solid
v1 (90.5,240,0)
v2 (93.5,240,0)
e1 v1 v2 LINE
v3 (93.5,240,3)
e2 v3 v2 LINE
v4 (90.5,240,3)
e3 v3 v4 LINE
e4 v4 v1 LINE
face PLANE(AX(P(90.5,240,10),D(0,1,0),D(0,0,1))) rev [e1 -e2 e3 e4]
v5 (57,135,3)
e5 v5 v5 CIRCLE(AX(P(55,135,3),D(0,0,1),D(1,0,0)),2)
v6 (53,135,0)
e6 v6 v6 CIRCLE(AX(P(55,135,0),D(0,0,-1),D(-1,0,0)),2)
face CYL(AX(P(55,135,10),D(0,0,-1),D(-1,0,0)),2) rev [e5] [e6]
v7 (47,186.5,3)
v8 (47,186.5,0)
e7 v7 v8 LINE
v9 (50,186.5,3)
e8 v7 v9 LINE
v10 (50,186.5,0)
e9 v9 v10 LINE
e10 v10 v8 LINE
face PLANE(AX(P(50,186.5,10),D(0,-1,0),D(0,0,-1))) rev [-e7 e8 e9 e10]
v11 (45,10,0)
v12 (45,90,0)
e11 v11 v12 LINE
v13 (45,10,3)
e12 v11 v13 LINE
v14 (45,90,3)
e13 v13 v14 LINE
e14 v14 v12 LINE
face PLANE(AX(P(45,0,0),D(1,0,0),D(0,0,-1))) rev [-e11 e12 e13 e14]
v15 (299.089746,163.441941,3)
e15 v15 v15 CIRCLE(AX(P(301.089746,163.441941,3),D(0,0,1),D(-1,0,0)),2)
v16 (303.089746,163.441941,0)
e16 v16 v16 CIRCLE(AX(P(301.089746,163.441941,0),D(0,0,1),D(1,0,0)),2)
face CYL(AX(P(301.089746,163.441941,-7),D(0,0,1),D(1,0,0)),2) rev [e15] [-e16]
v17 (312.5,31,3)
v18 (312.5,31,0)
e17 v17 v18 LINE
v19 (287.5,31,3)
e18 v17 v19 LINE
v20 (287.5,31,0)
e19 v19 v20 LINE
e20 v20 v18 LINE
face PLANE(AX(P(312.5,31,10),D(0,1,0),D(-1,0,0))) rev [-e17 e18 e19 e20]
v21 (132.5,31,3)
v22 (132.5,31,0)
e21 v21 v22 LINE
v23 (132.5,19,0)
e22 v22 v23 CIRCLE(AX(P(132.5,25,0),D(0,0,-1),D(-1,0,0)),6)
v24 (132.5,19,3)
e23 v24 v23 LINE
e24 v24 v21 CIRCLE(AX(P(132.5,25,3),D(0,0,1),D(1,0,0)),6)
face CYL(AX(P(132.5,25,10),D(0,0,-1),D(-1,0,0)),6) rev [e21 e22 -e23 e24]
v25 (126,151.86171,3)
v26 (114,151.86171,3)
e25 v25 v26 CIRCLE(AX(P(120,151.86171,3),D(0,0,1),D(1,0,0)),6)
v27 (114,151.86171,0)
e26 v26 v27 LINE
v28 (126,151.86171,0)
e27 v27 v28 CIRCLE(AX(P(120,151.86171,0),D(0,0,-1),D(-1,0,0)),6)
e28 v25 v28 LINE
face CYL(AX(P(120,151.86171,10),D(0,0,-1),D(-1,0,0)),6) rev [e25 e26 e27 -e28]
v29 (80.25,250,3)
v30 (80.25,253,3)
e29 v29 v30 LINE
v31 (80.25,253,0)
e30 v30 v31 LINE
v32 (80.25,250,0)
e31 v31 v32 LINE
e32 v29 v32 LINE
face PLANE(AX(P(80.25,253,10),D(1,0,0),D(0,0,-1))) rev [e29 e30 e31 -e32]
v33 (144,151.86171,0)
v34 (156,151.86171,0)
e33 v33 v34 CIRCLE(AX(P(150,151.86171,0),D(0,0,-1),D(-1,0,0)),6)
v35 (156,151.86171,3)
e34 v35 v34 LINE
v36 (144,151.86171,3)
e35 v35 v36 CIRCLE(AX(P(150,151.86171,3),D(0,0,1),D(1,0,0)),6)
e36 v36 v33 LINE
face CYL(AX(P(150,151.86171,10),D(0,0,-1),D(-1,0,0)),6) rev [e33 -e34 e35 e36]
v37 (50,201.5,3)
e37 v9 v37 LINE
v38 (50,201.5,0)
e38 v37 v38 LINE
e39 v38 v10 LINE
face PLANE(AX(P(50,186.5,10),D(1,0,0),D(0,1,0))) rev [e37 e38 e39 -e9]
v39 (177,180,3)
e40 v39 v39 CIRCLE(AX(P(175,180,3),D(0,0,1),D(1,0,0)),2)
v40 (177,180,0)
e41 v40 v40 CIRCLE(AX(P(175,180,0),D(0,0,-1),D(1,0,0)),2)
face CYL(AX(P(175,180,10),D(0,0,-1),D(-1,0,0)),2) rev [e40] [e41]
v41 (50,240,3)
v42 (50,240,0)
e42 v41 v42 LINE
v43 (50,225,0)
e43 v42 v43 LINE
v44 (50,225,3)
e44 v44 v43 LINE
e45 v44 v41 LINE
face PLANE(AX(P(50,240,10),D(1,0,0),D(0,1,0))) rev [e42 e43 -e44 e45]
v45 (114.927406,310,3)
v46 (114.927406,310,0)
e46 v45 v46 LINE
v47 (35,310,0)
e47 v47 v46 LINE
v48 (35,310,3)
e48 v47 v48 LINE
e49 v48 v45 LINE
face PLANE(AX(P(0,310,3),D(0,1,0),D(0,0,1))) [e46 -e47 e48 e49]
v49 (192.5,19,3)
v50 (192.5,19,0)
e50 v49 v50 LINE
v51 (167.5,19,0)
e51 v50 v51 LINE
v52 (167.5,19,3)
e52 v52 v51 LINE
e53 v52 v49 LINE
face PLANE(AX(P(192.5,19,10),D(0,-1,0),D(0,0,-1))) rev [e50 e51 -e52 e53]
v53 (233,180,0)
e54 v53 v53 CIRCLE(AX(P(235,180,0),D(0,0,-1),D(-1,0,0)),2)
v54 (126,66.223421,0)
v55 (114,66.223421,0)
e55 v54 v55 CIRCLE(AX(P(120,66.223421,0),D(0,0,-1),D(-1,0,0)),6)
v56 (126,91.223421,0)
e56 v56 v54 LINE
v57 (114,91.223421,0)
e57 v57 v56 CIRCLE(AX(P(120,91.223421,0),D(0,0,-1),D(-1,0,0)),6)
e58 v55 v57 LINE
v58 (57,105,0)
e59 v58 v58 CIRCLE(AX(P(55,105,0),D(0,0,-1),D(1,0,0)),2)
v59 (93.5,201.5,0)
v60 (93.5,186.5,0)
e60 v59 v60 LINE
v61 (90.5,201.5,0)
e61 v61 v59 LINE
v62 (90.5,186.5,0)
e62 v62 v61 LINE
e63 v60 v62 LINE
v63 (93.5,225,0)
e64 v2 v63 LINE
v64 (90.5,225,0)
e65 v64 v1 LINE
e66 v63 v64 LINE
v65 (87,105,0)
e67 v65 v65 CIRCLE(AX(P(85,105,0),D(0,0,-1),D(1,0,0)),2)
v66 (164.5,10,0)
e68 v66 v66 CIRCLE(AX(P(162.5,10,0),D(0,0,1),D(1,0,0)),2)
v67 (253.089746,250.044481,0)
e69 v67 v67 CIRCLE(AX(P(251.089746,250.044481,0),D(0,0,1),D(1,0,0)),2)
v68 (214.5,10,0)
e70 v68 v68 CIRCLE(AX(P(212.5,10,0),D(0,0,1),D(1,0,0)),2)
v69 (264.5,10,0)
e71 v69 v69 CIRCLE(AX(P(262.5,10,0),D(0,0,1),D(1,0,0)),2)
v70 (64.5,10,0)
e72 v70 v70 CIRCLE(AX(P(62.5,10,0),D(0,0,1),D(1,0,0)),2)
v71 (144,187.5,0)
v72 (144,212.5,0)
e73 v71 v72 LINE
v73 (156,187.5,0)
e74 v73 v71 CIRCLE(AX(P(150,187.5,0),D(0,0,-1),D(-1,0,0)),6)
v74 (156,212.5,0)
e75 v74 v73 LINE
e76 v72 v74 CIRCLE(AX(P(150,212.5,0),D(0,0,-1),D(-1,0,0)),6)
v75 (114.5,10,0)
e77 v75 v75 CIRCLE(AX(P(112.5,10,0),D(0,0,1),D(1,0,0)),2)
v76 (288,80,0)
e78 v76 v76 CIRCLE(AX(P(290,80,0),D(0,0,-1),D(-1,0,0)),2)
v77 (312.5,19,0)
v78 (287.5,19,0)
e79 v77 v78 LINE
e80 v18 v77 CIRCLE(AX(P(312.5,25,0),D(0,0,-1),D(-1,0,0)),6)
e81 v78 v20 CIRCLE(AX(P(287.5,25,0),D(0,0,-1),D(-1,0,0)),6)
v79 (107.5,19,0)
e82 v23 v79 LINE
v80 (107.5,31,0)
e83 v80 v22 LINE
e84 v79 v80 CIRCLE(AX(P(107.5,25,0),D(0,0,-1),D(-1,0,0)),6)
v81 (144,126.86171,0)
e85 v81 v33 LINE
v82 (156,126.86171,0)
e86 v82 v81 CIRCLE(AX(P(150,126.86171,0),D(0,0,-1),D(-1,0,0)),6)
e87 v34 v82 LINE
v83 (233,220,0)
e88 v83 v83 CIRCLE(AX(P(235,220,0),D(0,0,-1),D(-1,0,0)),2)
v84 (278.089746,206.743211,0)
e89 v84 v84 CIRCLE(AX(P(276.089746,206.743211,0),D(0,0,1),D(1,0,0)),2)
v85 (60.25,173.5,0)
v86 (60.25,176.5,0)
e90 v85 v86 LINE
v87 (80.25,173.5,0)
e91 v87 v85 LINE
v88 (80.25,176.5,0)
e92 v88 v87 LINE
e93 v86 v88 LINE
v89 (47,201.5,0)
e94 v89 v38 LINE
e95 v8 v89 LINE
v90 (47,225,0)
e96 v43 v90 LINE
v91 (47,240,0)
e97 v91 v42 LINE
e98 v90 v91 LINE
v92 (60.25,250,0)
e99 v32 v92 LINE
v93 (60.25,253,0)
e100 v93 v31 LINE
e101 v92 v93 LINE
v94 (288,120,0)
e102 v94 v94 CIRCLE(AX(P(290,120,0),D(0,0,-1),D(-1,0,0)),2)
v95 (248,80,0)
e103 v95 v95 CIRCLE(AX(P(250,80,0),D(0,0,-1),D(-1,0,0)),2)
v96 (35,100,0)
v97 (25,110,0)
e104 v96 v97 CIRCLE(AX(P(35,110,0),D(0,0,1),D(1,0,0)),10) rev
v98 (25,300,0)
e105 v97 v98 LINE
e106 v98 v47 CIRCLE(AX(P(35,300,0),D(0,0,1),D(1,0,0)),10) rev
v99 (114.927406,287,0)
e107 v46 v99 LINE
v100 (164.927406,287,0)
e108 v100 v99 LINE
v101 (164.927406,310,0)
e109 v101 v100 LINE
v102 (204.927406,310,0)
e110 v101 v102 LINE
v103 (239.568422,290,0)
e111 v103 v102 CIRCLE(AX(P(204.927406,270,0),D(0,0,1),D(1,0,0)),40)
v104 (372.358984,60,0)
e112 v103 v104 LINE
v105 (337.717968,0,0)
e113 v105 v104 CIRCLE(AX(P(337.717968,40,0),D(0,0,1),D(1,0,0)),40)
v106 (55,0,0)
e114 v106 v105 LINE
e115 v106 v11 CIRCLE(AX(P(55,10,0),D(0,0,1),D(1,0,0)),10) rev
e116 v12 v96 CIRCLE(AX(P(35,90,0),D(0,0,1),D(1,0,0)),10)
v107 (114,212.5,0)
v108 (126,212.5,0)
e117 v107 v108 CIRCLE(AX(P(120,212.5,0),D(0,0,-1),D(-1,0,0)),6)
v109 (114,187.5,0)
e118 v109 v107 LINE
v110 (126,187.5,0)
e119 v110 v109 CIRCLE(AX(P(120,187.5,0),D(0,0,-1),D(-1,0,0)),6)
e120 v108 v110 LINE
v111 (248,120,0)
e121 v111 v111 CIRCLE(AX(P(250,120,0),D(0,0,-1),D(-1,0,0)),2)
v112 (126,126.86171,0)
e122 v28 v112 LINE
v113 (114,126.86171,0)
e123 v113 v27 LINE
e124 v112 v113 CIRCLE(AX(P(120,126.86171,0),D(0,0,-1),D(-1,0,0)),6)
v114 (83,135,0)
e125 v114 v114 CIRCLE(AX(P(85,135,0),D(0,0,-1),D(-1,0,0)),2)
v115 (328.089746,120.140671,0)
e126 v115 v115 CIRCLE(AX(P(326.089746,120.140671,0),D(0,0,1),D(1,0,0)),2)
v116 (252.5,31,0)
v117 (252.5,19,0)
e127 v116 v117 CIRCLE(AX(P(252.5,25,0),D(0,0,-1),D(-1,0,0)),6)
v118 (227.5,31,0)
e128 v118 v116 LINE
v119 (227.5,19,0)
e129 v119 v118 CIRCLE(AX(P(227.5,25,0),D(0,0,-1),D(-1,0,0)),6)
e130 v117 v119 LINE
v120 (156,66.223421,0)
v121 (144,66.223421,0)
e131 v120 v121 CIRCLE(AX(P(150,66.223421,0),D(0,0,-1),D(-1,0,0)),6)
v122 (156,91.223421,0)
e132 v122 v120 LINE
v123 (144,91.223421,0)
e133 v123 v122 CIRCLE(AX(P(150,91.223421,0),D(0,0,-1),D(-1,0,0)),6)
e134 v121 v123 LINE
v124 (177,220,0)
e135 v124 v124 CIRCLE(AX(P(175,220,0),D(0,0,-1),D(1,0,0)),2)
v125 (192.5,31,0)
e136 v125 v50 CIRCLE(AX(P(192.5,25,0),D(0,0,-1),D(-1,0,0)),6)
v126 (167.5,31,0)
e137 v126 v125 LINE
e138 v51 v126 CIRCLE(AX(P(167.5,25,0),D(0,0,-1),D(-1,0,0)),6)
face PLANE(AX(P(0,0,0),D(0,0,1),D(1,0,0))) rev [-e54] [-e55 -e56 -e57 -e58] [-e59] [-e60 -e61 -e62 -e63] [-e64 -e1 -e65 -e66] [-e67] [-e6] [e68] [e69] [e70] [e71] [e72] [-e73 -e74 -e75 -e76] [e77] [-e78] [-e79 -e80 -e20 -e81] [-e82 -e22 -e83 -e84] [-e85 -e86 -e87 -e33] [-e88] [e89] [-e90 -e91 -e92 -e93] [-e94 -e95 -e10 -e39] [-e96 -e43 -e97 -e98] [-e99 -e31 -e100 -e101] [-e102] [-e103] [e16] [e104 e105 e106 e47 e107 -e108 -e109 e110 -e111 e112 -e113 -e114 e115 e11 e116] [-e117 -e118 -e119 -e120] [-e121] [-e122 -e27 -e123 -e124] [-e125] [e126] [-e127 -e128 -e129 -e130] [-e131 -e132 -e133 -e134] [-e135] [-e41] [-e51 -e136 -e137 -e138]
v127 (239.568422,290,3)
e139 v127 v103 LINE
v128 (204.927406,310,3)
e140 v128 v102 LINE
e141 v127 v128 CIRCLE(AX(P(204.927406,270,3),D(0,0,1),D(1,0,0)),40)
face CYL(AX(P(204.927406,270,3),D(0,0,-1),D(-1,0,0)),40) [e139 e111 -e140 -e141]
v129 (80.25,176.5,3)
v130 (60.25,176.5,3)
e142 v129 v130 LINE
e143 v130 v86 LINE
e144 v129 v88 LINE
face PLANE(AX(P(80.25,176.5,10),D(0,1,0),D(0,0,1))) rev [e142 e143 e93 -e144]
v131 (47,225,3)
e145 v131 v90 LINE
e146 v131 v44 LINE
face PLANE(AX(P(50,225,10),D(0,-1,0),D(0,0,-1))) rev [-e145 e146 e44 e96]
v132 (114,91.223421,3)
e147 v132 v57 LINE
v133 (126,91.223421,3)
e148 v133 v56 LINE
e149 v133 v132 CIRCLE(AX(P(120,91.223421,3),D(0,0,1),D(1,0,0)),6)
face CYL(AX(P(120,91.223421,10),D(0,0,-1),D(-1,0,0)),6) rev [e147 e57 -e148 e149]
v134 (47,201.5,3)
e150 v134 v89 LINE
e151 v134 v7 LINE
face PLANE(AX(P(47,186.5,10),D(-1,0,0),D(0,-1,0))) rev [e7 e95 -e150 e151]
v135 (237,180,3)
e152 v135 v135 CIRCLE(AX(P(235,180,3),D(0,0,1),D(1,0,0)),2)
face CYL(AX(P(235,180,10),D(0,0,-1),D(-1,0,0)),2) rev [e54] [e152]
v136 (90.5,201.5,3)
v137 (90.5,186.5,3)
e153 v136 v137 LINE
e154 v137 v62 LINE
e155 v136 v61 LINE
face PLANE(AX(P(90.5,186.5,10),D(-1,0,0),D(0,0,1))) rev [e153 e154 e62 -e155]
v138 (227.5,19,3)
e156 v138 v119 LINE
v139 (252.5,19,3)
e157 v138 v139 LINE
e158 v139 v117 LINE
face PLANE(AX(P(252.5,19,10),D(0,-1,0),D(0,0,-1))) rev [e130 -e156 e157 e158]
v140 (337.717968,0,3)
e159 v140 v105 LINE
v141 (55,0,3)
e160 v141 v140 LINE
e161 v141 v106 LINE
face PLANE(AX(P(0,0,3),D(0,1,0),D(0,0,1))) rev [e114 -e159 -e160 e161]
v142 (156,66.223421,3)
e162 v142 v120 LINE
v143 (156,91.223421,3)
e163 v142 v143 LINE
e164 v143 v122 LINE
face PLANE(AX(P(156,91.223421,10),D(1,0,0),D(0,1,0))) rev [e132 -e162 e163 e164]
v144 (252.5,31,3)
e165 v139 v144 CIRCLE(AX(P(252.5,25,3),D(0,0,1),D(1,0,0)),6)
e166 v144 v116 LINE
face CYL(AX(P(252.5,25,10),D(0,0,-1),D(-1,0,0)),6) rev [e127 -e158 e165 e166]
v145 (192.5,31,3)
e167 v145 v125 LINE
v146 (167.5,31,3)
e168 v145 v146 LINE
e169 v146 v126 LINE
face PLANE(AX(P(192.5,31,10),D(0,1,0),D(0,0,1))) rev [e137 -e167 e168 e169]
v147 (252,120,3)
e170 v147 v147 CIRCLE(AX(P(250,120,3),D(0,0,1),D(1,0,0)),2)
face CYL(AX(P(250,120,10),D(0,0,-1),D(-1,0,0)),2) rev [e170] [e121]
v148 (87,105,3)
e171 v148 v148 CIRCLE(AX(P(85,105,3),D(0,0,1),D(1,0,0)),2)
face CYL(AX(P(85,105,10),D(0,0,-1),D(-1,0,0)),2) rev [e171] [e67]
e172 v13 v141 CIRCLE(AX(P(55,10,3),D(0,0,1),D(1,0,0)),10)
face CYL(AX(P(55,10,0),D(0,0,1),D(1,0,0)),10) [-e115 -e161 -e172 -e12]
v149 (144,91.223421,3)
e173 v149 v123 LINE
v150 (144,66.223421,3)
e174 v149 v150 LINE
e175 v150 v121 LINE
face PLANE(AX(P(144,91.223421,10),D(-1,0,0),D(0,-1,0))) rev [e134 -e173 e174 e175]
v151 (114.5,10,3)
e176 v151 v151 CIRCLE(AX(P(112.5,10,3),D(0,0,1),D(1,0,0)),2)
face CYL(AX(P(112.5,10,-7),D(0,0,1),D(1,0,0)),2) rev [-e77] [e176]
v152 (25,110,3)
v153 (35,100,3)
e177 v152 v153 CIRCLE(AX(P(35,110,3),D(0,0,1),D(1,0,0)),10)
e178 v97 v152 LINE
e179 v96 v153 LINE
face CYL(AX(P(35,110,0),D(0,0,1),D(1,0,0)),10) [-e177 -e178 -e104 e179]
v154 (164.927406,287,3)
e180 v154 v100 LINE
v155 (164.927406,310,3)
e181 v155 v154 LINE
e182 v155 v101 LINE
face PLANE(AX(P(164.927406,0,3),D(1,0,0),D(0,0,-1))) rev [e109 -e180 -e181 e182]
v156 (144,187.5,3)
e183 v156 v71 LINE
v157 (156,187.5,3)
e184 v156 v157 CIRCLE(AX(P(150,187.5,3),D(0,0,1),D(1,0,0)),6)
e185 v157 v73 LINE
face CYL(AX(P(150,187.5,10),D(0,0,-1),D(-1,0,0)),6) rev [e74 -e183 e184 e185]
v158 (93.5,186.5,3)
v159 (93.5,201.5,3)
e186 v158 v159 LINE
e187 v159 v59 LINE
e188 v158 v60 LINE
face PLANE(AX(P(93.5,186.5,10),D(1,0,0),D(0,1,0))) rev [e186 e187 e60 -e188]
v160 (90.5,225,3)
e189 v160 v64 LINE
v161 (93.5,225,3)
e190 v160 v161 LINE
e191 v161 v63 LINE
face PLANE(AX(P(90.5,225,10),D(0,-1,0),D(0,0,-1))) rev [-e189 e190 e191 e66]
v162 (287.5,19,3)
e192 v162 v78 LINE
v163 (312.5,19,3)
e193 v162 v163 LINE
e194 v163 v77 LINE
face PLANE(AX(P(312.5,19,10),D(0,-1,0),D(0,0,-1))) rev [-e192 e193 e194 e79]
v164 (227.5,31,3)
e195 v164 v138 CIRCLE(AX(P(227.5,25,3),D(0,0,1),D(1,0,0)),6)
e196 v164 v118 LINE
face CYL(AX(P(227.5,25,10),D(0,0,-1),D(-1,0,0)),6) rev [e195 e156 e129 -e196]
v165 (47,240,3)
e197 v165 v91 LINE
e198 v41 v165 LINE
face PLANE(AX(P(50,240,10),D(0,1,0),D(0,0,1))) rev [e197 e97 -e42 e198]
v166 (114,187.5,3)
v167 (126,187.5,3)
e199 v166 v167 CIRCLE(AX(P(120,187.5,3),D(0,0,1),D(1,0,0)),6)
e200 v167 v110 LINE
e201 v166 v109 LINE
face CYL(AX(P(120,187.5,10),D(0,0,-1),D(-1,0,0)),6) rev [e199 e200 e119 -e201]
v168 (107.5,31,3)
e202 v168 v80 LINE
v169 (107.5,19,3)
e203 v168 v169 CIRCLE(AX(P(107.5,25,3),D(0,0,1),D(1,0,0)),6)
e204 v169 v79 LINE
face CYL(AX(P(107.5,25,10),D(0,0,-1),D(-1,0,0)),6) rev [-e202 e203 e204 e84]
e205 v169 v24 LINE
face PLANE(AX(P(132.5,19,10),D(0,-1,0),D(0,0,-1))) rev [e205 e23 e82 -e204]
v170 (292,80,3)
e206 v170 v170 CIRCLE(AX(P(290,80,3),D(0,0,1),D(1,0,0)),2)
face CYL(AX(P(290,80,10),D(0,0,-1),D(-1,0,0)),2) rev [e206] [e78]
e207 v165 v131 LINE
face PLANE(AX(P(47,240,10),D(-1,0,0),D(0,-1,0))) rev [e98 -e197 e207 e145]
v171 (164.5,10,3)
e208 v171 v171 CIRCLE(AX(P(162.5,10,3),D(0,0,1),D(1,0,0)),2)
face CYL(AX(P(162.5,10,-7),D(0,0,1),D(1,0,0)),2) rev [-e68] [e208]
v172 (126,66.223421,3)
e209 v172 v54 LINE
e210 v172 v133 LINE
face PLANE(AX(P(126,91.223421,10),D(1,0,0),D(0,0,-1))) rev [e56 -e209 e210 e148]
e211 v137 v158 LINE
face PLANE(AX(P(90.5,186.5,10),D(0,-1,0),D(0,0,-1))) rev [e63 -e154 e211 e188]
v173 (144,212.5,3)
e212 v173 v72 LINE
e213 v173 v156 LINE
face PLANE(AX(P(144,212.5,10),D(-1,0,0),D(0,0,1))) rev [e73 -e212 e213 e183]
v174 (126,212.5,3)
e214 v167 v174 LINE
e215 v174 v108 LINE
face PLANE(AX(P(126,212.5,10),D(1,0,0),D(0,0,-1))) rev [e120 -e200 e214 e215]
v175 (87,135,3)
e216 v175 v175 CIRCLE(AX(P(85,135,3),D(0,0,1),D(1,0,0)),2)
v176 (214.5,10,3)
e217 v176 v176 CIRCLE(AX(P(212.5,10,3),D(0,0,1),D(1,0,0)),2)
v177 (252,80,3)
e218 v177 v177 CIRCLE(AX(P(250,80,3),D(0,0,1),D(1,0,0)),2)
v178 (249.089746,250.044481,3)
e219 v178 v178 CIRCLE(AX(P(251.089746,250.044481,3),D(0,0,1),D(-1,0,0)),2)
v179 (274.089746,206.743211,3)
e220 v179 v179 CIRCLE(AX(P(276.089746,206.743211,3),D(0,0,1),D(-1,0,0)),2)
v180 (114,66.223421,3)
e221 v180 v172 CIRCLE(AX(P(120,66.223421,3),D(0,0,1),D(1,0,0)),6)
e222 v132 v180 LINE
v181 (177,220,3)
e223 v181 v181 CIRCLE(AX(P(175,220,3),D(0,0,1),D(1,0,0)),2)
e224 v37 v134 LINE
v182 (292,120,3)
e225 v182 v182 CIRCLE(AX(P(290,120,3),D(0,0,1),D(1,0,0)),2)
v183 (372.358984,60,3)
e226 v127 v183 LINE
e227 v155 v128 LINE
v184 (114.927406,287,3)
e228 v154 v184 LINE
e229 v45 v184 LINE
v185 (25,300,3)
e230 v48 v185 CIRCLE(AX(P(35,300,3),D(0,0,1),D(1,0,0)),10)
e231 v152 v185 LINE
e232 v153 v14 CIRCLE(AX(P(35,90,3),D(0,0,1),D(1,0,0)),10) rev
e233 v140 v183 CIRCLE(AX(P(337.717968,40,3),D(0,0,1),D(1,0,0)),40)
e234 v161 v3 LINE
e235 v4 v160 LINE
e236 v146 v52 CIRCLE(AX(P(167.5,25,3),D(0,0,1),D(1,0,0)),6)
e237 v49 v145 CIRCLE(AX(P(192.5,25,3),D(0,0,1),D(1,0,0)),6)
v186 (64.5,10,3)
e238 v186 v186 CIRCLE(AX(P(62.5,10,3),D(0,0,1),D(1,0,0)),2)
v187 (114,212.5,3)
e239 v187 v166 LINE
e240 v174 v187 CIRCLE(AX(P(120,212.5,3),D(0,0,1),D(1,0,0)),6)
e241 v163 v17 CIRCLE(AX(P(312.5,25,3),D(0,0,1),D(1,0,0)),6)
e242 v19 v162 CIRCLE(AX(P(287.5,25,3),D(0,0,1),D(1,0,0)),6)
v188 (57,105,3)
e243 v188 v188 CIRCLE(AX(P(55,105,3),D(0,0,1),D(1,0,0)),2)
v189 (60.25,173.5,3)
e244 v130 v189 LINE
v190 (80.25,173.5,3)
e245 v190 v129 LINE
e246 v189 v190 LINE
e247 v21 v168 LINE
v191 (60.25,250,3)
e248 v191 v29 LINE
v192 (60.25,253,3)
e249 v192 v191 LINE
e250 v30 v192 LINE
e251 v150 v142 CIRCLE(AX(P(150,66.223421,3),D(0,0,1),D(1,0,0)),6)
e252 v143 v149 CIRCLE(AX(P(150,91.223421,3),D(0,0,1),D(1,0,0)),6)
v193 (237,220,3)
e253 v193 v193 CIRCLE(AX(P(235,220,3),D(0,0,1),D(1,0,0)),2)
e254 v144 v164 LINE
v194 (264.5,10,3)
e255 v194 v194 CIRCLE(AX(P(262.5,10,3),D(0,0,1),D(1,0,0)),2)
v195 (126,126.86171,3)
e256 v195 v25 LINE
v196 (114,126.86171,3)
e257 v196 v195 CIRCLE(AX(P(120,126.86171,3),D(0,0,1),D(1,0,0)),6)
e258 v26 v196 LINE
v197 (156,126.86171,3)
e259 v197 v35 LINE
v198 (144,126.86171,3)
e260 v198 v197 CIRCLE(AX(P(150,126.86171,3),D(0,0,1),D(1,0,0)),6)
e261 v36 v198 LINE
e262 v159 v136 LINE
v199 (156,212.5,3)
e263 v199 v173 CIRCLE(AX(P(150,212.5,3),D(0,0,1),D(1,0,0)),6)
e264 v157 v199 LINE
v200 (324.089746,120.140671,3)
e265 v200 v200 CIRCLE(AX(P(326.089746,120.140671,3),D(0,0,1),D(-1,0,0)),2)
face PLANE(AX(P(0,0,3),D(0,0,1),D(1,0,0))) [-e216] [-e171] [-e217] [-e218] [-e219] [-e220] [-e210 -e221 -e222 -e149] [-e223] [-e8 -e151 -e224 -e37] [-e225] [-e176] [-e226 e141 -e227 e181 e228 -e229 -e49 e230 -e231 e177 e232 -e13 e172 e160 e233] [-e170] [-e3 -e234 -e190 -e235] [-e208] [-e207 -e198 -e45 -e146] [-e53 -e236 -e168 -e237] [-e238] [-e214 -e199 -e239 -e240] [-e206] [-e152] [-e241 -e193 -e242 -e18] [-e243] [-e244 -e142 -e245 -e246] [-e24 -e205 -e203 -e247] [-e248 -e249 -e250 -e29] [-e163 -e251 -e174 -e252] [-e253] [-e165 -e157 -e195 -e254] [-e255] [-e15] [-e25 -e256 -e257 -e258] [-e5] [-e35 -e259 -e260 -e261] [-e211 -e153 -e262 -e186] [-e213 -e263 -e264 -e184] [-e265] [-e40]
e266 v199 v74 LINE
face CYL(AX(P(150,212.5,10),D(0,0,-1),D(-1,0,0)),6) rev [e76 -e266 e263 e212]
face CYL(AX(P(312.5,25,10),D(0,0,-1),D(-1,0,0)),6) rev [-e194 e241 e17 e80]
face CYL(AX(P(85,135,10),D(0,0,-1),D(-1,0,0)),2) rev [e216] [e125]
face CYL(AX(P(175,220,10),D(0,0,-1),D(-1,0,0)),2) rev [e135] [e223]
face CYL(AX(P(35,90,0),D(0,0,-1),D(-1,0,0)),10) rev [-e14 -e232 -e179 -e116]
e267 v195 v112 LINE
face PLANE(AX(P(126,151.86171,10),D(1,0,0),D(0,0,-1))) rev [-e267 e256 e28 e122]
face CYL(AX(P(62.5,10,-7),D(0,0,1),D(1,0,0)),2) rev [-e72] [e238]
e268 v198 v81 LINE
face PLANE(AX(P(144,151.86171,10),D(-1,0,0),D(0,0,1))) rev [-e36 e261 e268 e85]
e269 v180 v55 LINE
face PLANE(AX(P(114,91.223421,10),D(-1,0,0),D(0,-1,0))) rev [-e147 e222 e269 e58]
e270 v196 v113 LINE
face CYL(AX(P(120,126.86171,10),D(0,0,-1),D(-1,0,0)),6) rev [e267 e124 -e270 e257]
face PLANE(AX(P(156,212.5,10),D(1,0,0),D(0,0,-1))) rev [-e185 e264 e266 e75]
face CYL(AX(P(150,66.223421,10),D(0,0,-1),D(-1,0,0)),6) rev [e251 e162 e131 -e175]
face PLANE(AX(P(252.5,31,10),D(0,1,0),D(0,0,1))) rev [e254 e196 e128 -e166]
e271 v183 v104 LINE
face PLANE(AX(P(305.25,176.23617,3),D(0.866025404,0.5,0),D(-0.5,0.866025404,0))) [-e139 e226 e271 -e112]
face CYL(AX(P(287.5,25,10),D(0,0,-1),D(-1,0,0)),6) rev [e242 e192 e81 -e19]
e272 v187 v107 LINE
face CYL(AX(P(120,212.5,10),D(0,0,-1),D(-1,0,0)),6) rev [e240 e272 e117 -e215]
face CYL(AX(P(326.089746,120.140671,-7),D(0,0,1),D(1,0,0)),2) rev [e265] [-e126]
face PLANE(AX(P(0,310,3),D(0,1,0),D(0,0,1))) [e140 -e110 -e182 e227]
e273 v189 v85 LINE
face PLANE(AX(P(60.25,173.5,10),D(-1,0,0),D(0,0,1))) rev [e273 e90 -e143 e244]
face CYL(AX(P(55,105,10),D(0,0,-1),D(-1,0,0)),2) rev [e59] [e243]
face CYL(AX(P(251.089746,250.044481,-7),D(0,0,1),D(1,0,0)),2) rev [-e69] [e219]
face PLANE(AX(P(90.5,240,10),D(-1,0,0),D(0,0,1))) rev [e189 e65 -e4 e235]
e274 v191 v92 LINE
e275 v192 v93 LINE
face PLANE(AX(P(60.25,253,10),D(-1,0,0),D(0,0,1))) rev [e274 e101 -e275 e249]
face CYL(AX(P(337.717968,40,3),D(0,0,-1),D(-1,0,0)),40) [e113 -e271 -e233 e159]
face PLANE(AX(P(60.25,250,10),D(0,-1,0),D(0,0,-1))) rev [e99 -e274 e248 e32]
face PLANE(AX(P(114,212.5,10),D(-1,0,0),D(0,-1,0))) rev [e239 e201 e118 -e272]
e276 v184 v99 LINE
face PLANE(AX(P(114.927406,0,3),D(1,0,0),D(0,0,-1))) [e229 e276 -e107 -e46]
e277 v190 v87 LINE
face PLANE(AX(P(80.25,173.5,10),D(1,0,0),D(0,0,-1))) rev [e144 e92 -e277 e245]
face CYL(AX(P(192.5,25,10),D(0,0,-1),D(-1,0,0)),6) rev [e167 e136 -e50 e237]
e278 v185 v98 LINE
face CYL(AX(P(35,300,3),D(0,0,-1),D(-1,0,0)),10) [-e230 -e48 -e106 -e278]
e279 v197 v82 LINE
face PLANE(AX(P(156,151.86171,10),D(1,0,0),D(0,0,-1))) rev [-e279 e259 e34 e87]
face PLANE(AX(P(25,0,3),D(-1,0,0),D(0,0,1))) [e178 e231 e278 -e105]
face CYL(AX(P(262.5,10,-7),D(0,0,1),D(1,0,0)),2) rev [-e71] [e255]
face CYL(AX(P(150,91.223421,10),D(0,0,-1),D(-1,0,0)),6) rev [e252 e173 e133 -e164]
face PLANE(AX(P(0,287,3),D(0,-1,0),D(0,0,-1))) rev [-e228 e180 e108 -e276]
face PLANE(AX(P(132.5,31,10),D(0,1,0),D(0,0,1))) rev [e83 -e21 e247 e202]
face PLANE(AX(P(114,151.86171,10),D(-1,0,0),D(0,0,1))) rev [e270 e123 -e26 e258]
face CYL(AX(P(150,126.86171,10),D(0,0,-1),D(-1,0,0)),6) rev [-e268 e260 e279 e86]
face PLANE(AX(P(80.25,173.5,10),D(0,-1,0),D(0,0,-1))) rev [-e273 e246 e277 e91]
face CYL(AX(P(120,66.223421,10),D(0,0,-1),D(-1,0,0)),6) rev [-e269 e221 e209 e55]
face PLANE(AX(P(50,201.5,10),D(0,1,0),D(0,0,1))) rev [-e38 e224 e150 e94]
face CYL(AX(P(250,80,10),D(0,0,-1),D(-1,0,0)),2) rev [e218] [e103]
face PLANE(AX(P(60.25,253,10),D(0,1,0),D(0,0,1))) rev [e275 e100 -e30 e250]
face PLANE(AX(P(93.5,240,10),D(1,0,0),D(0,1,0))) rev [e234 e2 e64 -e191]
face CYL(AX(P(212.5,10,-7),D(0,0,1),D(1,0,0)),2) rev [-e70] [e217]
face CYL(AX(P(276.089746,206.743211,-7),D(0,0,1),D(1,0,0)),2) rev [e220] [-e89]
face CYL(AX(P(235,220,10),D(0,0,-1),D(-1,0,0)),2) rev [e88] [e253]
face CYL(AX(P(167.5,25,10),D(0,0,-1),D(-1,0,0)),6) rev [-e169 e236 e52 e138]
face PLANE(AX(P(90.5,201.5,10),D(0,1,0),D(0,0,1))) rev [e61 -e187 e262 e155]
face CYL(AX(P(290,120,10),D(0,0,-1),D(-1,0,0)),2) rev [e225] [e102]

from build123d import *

# Parameters (mm, degrees)
EXTRUDE_1_DEPTH        = 3
SKETCH_2_R             = 2
CUT_EXTRUDE_1_DEPTH    = 10
SKETCH_3_W             = 45
SKETCH_3_H             = 100
CUT_EXTRUDE_2_DEPTH    = 489.651064791
FILLET_1_R             = 10
SKETCH_5_W             = 3
SKETCH_5_H             = 15
SKETCH_5_W_2           = 20
SKETCH_5_H_2           = 3
CUT_EXTRUDE_2593_DEPTH = 10
CUT_EXTRUDE_3695_DEPTH = 10
SKETCH_7_R             = 2
CUT_EXTRUDE_5_DEPTH    = 10


with BuildPart() as part:
    # 草图1 → 凸台-拉伸1 (new body)
    with BuildSketch(Plane.XY):
        with BuildLine():
            Line((0, 66), (0, 0))
            Line((0, 0), (337.717967697, 0))
            ThreePointArc((337.717967697, 0), (372.358983849, 20), (372.358983849, 60))
            Line((372.358983849, 60), (239.568421935, 290))
            ThreePointArc((239.568421935, 290), (224.927405784, 304.641016151), (204.927405784, 310))
            Line((204.927405784, 310), (164.927405784, 310))
            Line((164.927405784, 310), (164.927405784, 287))
            Line((164.927405784, 287), (114.927405784, 287))
            Line((114.927405784, 287), (114.927405784, 310))
            Line((114.927405784, 310), (25, 310))
            Line((25, 310), (25, 66))
            Line((25, 66), (0, 66))
        make_face()
    extrude(amount=EXTRUDE_1_DEPTH)

    # 草图2 → 切除-拉伸1 (cut)
    with BuildSketch(Plane.XY.offset(3)):
        with Locations((262.5, 10)):
            Circle(SKETCH_2_R)
        with Locations((212.5, 10)):
            Circle(SKETCH_2_R)
        with Locations((162.5, 10)):
            Circle(SKETCH_2_R)
        with Locations((112.5, 10)):
            Circle(SKETCH_2_R)
        with Locations((62.5, 10)):
            Circle(SKETCH_2_R)
        with Locations((251.089745962, 250.044481415)):
            Circle(SKETCH_2_R)
        with Locations((276.089745962, 206.743211225)):
            Circle(SKETCH_2_R)
        with Locations((301.089745962, 163.441941036)):
            Circle(SKETCH_2_R)
        with Locations((326.089745962, 120.140670847)):
            Circle(SKETCH_2_R)
    extrude(amount=-CUT_EXTRUDE_1_DEPTH, mode=Mode.SUBTRACT)

    # 草图3 → 切除-拉伸2 (cut, through all)
    with BuildSketch(Plane.XY.offset(3)):
        with Locations((22.5, 50)):
            Rectangle(SKETCH_3_W, SKETCH_3_H)
    extrude(amount=-CUT_EXTRUDE_2_DEPTH, mode=Mode.SUBTRACT)

    # 圆角1
    fillet_1_edges = [part.edges().sort_by_distance(p)[0] for p in [
        (25, 310, 1.5),
        (25, 100, 1.5),
        (45, 100, 1.5),
        (45, 0, 1.5),
    ]]
    fillet(fillet_1_edges, radius=FILLET_1_R - 0.0001)  # a hair under: the kernel refuses the full size

    # 草图5 → Cut-Extrude 2593 (cut)
    with BuildSketch(Plane(origin=(0, 0, 0), x_dir=(-1, 0, 0), z_dir=(0, 0, -1))):
        with Locations((-92, 232.5)):
            Rectangle(SKETCH_5_W, SKETCH_5_H)
        with Locations((-92, 194)):
            Rectangle(SKETCH_5_W, SKETCH_5_H)
        with Locations((-48.5, 194)):
            Rectangle(SKETCH_5_W, SKETCH_5_H)
        with Locations((-48.5, 232.5)):
            Rectangle(SKETCH_5_W, SKETCH_5_H)
        with Locations((-70.25, 251.5)):
            Rectangle(SKETCH_5_W_2, SKETCH_5_H_2)
        with Locations((-70.25, 175)):
            Rectangle(SKETCH_5_W_2, SKETCH_5_H_2)
    extrude(amount=-CUT_EXTRUDE_2593_DEPTH, mode=Mode.SUBTRACT)

    # 草图6 → Cut-Extrude 3695 (cut)
    with BuildSketch(Plane(origin=(0, 0, 0), x_dir=(-1, 0, 0), z_dir=(0, 0, -1))):
        with BuildLine():
            Line((-312.5, 31), (-287.5, 31))
            ThreePointArc((-287.5, 31), (-281.5, 25), (-287.5, 19))
            Line((-287.5, 19), (-312.5, 19))
            ThreePointArc((-312.5, 19), (-318.5, 25), (-312.5, 31))
        make_face()
        with BuildLine():
            Line((-252.5, 19), (-227.5, 19))
            ThreePointArc((-227.5, 19), (-221.5, 25), (-227.5, 31))
            Line((-227.5, 31), (-252.5, 31))
            ThreePointArc((-252.5, 31), (-258.5, 25), (-252.5, 19))
        make_face()
        with BuildLine():
            Line((-192.5, 19), (-167.5, 19))
            ThreePointArc((-167.5, 19), (-161.5, 25), (-167.5, 31))
            Line((-167.5, 31), (-192.5, 31))
            ThreePointArc((-192.5, 31), (-198.5, 25), (-192.5, 19))
        make_face()
        with BuildLine():
            Line((-132.5, 19), (-107.5, 19))
            ThreePointArc((-107.5, 19), (-101.5, 25), (-107.5, 31))
            Line((-107.5, 31), (-132.5, 31))
            ThreePointArc((-132.5, 31), (-138.5, 25), (-132.5, 19))
        make_face()
        with BuildLine():
            Line((-114, 212.5), (-114, 187.5))
            ThreePointArc((-114, 187.5), (-120, 181.5), (-126, 187.5))
            Line((-126, 187.5), (-126, 212.5))
            ThreePointArc((-126, 212.5), (-120, 218.5), (-114, 212.5))
        make_face()
        with BuildLine():
            Line((-144, 212.5), (-144, 187.5))
            ThreePointArc((-144, 187.5), (-150, 181.5), (-156, 187.5))
            Line((-156, 187.5), (-156, 212.5))
            ThreePointArc((-156, 212.5), (-150, 218.5), (-144, 212.5))
        make_face()
        with BuildLine():
            Line((-144, 151.861710405), (-144, 126.861710405))
            ThreePointArc((-144, 126.861710405), (-150, 120.861710405), (-156, 126.861710405))
            Line((-156, 126.861710405), (-156, 151.861710405))
            ThreePointArc((-156, 151.861710405), (-150, 157.861710405), (-144, 151.861710405))
        make_face()
        with BuildLine():
            Line((-144, 91.22342081), (-144, 66.22342081))
            ThreePointArc((-144, 66.22342081), (-150, 60.22342081), (-156, 66.22342081))
            Line((-156, 66.22342081), (-156, 91.22342081))
            ThreePointArc((-156, 91.22342081), (-150, 97.22342081), (-144, 91.22342081))
        make_face()
        with BuildLine():
            Line((-114, 151.861710405), (-114, 126.861710405))
            ThreePointArc((-114, 126.861710405), (-120, 120.861710405), (-126, 126.861710405))
            Line((-126, 126.861710405), (-126, 151.861710405))
            ThreePointArc((-126, 151.861710405), (-120, 157.861710405), (-114, 151.861710405))
        make_face()
        with BuildLine():
            Line((-114, 91.22342081), (-114, 66.22342081))
            ThreePointArc((-114, 66.22342081), (-120, 60.22342081), (-126, 66.22342081))
            Line((-126, 66.22342081), (-126, 91.22342081))
            ThreePointArc((-126, 91.22342081), (-120, 97.22342081), (-114, 91.22342081))
        make_face()
    extrude(amount=-CUT_EXTRUDE_3695_DEPTH, mode=Mode.SUBTRACT)

    # 草图7 → 切除-拉伸5 (cut)
    with BuildSketch(Plane(origin=(0, 0, 0), x_dir=(-1, 0, 0), z_dir=(0, 0, -1))):
        with Locations((-290, 120)):
            Circle(SKETCH_7_R)
        with Locations((-250, 120)):
            Circle(SKETCH_7_R)
        with Locations((-290, 80)):
            Circle(SKETCH_7_R)
        with Locations((-250, 80)):
            Circle(SKETCH_7_R)
        with Locations((-85, 135)):
            Circle(SKETCH_7_R)
        with Locations((-55, 135)):
            Circle(SKETCH_7_R)
        with Locations(Location((-55, 105, 0), (0, 0, 180))):
            Circle(SKETCH_7_R)
        with Locations(Location((-85, 105, 0), (0, 0, 180))):
            Circle(SKETCH_7_R)
        with Locations((-235, 220)):
            Circle(SKETCH_7_R)
        with Locations((-235, 180)):
            Circle(SKETCH_7_R)
        with Locations(Location((-175, 180, 0), (0, 0, 180))):
            Circle(SKETCH_7_R)
        with Locations(Location((-175, 220, 0), (0, 0, 180))):
            Circle(SKETCH_7_R)
    extrude(amount=-CUT_EXTRUDE_5_DEPTH, mode=Mode.SUBTRACT)


solid = part.part
